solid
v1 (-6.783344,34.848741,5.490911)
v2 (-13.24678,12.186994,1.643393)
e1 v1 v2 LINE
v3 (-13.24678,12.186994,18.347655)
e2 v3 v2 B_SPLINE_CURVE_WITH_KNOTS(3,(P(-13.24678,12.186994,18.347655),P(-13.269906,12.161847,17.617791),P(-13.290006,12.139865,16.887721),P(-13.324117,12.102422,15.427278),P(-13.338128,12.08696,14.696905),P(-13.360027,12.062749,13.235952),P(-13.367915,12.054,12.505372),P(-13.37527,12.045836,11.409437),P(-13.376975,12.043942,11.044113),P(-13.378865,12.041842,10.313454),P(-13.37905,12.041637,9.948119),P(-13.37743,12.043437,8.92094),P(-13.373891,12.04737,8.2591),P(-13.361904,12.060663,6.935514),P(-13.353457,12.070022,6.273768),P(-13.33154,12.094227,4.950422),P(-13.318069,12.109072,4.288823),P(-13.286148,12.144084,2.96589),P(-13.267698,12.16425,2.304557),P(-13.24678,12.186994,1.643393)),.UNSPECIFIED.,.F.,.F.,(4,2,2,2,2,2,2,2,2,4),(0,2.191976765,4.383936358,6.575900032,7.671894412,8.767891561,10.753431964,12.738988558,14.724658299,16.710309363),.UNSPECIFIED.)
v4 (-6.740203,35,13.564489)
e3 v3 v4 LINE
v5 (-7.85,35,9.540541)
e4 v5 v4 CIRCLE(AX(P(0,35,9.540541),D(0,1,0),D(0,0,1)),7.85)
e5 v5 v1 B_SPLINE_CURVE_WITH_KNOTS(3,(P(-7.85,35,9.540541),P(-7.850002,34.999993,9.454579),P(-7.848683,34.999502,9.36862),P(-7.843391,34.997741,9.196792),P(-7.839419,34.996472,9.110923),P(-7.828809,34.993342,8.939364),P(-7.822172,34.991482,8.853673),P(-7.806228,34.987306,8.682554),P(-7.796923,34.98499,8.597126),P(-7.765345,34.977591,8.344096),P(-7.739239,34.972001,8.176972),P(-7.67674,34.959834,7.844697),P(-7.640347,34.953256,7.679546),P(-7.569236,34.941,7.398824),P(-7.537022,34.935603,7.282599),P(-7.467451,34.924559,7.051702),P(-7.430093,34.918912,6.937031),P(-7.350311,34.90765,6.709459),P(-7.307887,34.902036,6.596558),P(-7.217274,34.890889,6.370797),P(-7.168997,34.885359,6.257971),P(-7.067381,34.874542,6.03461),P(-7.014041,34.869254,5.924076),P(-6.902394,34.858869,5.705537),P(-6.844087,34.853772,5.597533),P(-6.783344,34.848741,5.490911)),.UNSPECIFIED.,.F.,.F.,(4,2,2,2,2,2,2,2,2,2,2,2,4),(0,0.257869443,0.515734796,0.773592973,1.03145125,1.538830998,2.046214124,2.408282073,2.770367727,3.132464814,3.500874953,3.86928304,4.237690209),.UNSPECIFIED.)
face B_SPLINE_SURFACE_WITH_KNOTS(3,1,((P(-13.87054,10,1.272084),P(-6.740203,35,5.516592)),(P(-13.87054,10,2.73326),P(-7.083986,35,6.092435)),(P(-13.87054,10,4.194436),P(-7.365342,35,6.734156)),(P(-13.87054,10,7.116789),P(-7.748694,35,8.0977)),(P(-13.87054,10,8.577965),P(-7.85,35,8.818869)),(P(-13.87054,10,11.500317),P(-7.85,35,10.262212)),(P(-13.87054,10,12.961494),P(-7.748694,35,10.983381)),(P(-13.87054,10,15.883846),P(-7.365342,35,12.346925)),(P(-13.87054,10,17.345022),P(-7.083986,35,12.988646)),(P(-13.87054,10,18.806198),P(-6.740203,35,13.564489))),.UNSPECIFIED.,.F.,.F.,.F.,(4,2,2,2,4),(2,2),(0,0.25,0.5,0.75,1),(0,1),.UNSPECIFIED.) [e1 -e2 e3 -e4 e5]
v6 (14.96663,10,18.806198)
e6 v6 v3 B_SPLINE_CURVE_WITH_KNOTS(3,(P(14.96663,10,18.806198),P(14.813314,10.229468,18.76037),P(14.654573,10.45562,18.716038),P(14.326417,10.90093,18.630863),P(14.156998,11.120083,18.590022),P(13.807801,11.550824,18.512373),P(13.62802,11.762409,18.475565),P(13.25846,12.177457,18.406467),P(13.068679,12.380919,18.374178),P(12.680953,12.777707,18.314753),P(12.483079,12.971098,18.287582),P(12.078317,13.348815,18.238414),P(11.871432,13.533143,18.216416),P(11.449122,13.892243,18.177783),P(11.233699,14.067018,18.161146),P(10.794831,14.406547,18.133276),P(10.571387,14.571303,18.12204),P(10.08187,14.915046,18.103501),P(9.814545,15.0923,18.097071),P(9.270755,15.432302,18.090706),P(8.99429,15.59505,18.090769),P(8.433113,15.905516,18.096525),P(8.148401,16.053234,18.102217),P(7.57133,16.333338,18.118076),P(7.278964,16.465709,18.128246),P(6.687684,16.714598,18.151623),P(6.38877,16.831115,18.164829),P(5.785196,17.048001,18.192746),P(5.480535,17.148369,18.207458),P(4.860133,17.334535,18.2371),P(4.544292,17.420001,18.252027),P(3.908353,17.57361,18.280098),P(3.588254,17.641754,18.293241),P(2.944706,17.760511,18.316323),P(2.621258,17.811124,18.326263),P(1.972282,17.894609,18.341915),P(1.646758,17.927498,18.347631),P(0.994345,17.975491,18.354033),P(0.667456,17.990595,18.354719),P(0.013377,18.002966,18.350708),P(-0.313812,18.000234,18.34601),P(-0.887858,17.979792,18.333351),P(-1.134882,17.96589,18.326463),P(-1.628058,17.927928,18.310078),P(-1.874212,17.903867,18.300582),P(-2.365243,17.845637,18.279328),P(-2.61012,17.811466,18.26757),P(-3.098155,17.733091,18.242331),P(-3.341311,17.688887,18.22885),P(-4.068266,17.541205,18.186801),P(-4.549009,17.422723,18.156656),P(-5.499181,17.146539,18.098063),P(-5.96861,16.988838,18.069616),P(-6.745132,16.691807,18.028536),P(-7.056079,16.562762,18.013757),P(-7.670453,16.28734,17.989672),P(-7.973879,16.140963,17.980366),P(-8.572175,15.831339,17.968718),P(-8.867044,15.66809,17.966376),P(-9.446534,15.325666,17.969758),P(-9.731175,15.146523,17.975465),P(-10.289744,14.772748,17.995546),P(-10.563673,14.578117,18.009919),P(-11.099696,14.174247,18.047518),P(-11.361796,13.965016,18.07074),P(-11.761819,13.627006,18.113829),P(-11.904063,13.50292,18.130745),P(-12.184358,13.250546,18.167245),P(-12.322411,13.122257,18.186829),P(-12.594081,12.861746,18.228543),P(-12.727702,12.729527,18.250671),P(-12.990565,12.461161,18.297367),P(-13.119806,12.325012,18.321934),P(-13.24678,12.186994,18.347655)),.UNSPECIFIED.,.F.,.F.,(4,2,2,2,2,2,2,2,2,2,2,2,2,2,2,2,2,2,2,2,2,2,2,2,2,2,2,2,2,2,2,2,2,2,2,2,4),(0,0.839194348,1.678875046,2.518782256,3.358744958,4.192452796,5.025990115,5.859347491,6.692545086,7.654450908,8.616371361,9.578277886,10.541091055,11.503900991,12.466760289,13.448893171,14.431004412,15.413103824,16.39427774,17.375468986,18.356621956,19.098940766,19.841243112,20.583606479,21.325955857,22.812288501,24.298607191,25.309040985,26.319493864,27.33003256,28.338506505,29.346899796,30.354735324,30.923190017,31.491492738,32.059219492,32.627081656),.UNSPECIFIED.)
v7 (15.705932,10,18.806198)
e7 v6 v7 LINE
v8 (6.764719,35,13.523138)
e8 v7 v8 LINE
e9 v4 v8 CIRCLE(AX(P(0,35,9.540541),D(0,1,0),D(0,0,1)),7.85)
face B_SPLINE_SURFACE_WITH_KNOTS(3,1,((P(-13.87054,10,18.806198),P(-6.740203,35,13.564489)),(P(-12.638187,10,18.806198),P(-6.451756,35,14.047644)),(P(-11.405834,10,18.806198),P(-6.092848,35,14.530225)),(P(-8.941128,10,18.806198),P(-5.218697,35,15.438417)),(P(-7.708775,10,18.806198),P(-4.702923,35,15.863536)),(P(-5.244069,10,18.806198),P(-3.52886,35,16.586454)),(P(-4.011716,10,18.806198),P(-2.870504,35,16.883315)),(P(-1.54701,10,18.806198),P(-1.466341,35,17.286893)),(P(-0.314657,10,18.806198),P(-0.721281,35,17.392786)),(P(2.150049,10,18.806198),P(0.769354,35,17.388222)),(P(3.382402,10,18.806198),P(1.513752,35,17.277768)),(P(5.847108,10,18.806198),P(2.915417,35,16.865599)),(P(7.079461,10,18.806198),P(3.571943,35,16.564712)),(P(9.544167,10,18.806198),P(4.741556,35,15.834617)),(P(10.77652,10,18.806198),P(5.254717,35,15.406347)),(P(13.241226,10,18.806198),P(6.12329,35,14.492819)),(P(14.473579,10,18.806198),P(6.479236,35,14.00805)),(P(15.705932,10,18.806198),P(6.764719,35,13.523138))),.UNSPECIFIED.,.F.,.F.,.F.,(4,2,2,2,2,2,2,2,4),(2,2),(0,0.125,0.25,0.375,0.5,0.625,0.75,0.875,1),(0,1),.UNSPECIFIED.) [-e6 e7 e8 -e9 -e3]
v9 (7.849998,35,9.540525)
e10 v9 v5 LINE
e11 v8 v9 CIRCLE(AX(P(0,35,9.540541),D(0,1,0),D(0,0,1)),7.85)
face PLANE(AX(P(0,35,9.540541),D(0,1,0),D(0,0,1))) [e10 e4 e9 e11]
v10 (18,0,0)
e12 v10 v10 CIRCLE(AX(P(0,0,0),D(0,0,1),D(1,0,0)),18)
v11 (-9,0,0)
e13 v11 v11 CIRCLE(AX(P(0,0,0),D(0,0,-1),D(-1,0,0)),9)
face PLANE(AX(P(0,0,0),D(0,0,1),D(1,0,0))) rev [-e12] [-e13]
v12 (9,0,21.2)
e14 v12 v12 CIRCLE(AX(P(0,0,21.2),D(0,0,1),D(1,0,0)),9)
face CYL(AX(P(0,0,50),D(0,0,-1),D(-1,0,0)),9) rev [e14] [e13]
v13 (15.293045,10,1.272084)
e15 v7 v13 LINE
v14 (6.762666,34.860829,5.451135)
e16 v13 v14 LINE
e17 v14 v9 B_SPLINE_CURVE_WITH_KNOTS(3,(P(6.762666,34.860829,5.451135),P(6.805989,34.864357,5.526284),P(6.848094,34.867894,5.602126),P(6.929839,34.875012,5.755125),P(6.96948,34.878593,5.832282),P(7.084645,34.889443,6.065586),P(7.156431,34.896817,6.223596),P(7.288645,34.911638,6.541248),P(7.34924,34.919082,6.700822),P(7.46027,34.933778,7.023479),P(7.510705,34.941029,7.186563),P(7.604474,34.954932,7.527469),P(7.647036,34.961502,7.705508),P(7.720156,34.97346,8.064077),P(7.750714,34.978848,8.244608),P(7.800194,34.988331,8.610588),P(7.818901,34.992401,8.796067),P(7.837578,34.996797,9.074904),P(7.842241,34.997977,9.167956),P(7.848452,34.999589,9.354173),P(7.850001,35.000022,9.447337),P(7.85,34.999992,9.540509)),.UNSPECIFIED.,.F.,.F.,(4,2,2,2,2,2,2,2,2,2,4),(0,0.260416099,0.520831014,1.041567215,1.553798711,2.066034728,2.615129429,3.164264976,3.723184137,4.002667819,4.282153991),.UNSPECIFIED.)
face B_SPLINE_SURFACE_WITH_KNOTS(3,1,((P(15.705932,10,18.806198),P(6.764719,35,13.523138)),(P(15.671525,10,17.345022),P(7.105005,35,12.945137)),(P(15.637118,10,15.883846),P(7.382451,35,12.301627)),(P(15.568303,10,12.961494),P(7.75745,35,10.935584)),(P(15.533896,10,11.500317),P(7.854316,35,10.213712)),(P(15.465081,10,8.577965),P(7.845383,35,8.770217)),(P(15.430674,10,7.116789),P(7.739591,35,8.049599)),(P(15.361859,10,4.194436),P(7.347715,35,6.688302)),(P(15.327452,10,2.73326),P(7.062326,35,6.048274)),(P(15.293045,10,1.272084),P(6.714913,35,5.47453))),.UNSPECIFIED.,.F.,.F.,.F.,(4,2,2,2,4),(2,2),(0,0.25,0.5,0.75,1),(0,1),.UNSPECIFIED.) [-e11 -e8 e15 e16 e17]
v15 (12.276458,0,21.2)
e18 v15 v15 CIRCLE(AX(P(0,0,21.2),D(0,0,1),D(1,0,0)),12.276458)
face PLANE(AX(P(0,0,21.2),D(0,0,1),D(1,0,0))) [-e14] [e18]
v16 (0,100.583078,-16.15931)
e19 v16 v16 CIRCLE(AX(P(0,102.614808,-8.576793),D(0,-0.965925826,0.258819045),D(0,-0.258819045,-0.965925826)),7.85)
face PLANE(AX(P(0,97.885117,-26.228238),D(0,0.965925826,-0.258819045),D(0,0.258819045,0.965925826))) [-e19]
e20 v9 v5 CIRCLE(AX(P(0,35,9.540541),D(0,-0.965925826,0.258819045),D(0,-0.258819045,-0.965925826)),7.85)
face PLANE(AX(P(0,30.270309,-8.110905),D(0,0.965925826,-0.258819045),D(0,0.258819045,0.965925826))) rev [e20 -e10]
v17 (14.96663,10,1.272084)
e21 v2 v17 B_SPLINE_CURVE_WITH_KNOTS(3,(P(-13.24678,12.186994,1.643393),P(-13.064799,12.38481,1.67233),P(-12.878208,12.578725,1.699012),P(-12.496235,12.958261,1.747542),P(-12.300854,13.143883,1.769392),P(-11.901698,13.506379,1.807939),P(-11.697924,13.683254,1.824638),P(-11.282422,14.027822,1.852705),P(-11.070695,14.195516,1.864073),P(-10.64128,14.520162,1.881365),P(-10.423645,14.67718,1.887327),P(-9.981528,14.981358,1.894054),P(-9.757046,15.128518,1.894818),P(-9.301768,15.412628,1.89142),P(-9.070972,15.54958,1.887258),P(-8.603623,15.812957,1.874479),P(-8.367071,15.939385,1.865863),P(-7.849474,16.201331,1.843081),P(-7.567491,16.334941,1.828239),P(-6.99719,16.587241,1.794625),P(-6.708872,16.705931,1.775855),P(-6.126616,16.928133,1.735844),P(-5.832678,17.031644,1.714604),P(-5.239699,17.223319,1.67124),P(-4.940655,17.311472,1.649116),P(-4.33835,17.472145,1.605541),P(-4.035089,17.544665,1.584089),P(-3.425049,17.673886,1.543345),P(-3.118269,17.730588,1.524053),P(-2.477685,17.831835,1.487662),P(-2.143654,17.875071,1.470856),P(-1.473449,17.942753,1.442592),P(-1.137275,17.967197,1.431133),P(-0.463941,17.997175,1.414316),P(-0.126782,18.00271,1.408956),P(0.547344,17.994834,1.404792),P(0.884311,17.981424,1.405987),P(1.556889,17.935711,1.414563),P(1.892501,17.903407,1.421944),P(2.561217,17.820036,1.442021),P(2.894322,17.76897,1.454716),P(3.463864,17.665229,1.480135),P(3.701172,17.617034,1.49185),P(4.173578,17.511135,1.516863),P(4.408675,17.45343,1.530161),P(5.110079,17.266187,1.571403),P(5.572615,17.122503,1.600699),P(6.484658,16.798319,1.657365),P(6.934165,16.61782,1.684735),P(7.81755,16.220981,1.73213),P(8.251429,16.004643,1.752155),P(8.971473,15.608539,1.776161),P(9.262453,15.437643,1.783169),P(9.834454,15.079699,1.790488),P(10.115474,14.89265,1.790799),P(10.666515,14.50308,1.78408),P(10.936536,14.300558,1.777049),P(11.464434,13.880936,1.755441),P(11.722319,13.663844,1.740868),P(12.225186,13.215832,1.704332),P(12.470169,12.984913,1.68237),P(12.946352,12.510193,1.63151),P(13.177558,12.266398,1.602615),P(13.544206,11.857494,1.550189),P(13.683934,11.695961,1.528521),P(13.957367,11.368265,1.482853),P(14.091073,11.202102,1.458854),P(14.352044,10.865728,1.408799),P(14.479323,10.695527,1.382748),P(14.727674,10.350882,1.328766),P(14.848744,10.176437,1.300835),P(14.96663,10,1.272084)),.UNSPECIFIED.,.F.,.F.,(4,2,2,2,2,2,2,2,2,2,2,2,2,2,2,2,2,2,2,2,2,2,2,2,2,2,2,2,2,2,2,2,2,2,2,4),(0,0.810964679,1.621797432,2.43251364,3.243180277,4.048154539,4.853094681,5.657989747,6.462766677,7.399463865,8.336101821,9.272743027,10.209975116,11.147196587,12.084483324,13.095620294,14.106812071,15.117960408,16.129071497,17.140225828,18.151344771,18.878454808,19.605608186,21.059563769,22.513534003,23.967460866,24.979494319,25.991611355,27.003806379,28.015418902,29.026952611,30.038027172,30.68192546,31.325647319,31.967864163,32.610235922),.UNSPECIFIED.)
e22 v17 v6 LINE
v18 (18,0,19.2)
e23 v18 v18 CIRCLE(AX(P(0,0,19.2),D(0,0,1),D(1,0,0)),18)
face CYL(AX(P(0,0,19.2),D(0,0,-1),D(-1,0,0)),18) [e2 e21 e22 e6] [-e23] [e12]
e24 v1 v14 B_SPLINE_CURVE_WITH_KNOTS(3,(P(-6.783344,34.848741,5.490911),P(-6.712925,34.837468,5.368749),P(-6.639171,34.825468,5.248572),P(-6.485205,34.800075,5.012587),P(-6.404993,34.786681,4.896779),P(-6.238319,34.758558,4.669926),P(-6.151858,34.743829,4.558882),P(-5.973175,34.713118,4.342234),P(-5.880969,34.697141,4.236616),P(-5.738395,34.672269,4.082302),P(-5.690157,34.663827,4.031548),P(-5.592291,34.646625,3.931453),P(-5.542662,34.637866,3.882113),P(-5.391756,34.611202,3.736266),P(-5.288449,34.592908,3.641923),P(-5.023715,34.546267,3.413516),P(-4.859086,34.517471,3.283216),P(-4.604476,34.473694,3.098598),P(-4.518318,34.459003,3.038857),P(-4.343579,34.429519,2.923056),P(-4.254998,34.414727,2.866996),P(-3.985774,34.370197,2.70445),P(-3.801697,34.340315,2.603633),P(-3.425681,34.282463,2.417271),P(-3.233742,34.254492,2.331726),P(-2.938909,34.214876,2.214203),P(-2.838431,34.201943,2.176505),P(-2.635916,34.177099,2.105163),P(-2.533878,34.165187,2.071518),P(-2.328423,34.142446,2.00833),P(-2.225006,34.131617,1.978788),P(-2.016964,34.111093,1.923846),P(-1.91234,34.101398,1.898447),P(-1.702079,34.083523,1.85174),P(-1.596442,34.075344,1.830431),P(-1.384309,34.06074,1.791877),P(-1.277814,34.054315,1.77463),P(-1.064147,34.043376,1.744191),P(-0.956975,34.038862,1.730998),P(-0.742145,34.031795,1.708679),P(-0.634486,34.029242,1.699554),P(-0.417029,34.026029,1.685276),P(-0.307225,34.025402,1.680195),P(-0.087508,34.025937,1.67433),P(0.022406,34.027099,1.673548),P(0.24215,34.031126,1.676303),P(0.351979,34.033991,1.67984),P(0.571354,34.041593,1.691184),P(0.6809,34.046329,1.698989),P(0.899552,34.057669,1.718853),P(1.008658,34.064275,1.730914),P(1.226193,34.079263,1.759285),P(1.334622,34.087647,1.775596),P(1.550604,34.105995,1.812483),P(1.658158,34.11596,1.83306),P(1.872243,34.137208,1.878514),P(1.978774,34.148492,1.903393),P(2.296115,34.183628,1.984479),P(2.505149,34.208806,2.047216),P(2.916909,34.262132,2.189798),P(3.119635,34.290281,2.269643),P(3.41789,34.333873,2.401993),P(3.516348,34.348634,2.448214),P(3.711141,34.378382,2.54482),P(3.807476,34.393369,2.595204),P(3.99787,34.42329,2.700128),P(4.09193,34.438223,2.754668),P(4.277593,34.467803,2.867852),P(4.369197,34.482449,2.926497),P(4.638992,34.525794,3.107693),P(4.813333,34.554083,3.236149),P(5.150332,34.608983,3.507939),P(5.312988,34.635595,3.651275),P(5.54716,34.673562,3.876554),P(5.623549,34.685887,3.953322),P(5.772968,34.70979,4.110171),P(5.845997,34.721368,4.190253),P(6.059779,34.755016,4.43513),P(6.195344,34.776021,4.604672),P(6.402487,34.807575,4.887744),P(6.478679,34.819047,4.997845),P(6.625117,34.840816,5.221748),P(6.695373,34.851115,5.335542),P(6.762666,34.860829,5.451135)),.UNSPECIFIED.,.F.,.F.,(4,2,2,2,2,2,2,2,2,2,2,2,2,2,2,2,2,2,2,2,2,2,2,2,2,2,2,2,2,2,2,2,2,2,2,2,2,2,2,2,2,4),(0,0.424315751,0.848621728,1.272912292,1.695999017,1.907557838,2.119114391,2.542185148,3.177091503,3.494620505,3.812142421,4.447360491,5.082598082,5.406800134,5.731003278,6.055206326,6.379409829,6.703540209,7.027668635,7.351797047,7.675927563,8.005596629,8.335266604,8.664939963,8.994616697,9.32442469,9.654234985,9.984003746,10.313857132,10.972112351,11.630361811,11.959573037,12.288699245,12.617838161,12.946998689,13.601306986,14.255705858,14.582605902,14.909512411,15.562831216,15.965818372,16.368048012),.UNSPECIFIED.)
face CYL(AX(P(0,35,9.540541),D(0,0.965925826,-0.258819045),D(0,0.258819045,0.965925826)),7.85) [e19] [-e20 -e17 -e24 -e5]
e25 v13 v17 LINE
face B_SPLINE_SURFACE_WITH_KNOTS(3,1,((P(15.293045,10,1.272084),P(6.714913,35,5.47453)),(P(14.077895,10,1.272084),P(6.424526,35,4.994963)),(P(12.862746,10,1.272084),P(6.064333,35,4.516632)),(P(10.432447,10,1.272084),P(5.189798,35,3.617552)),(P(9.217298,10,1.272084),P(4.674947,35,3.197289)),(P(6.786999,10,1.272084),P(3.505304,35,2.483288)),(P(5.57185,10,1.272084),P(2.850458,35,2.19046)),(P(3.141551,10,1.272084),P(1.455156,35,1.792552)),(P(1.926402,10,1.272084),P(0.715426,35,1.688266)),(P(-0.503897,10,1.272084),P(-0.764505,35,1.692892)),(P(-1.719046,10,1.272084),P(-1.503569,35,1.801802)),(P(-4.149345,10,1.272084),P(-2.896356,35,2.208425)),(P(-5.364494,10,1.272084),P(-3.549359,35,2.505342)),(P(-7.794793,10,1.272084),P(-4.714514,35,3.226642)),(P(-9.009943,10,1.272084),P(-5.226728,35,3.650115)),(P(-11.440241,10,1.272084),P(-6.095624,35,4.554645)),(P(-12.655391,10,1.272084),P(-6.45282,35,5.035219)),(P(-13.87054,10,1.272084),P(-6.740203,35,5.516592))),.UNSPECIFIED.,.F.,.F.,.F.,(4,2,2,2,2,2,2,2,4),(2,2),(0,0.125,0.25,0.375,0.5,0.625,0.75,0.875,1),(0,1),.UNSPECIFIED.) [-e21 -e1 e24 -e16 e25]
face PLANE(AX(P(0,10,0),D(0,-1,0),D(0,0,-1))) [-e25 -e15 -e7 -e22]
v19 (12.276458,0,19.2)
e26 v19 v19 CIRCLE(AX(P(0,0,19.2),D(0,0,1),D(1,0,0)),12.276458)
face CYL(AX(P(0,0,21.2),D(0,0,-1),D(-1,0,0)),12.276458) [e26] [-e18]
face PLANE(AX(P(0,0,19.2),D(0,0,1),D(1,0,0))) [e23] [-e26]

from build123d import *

# Parameters (mm, degrees)
SKETCH1_R               = 18
BOSS_EXTRUDE1_DEPTH     = 19.2
SKETCH2_R               = 12.276458432
SKETCH2_R_2             = 8.347690183
BOSS_EXTRUDE2_DEPTH     = 2
SKETCH3_R               = 8.347690183
BOSS_EXTRUDE4_DEPTH     = 6.8
FILLET1_R               = 4
SKETCH13_R              = 9
CUT_EXTRUDE4_DEPTH      = 50
BOSS_EXTRUDE6_START     = 31.338130328
BOSS_EXTRUDE6_OUTLINE_R = 7.85
BOSS_EXTRUDE6_DEPTH     = 69.999999999


with BuildPart() as part:
    # Sketch1 → Boss-Extrude1 (new body)
    with BuildSketch(Plane.XY):
        Circle(SKETCH1_R)
    extrude(amount=BOSS_EXTRUDE1_DEPTH)

    # Sketch2 → Boss-Extrude2 (add)
    with BuildSketch(Plane.XY.offset(19.2)):
        Circle(SKETCH2_R)
        Circle(SKETCH2_R_2, mode=Mode.SUBTRACT)
    extrude(amount=BOSS_EXTRUDE2_DEPTH)

    # Sketch3 → Boss-Extrude4 (add)
    with BuildSketch(Plane.XY.offset(19.2)):
        Circle(SKETCH3_R)
    extrude(amount=BOSS_EXTRUDE4_DEPTH)

    # Fillet1
    fillet1_edges = [part.edges().sort_by_distance(p)[0] for p in [
        (-8.347690183, 0, 26),
    ]]
    fillet(fillet1_edges, radius=FILLET1_R)

    # Loft5: read off the stored shape, not the designer's step
    # Loft5: loft between two sections, ruled curve by curve
    loft5_from = [
        Edge.make_bspline([(-13.870540046, 10, 1.272084055), (-13.870540046, 10, 2.733260237), (-13.870540046, 10, 4.19443642), (-13.870540046, 10, 7.116788785), (-13.870540046, 10, 8.577964967), (-13.870540046, 10, 11.500317332), (-13.870540046, 10, 12.961493515), (-13.870540046, 10, 15.88384588), (-13.870540046, 10, 17.345022062), (-13.870540046, 10, 18.806198245)], [0, 0, 0, 0, 0.25, 0.25, 0.5, 0.5, 0.75, 0.75, 1, 1, 1, 1], 3),
        Edge.make_bspline([(-13.870540046, 10, 18.806198245), (-12.638187033, 10, 18.806198245), (-11.40583402, 10, 18.806198245), (-8.941127993, 10, 18.806198245), (-7.70877498, 10, 18.806198245), (-5.244068953, 10, 18.806198245), (-4.01171594, 10, 18.806198245), (-1.547009913, 10, 18.806198245), (-0.3146569, 10, 18.806198245), (2.150049127, 10, 18.806198245), (3.38240214, 10, 18.806198245), (5.847108167, 10, 18.806198245), (7.07946118, 10, 18.806198245), (9.544167207, 10, 18.806198245), (10.77652022, 10, 18.806198245), (13.241226247, 10, 18.806198245), (14.47357926, 10, 18.806198245), (15.705932273, 10, 18.806198245)], [0, 0, 0, 0, 0.125, 0.125, 0.25, 0.25, 0.375, 0.375, 0.5, 0.5, 0.625, 0.625, 0.75, 0.75, 0.875, 0.875, 1, 1, 1, 1], 3),
        Edge.make_bspline([(15.293044741, 10, 1.272084055), (14.077895375, 10, 1.272084055), (12.862746008, 10, 1.272084055), (10.432447276, 10, 1.272084055), (9.21729791, 10, 1.272084055), (6.786999178, 10, 1.272084055), (5.571849812, 10, 1.272084055), (3.141551079, 10, 1.272084055), (1.926401713, 10, 1.272084055), (-0.503897019, 10, 1.272084055), (-1.719046385, 10, 1.272084055), (-4.149345117, 10, 1.272084055), (-5.364494484, 10, 1.272084055), (-7.794793216, 10, 1.272084055), (-9.009942582, 10, 1.272084055), (-11.440241314, 10, 1.272084055), (-12.65539068, 10, 1.272084055), (-13.870540046, 10, 1.272084055)], [0, 0, 0, 0, 0.125, 0.125, 0.25, 0.25, 0.375, 0.375, 0.5, 0.5, 0.625, 0.625, 0.75, 0.75, 0.875, 0.875, 1, 1, 1, 1], 3),
        Edge.make_bspline([(15.705932273, 10, 18.806198245), (15.671524979, 10, 17.345022062), (15.637117685, 10, 15.88384588), (15.568303096, 10, 12.961493515), (15.533895801, 10, 11.500317332), (15.465081213, 10, 8.577964967), (15.430673918, 10, 7.116788785), (15.361859329, 10, 4.19443642), (15.327452035, 10, 2.733260237), (15.293044741, 10, 1.272084055)], [0, 0, 0, 0, 0.25, 0.25, 0.5, 0.5, 0.75, 0.75, 1, 1, 1, 1], 3),
    ]
    loft5_to = [
        Edge.make_bspline([(-6.740203008, 35, 5.516591807), (-7.083985671, 35, 6.09243536), (-7.365341755, 35, 6.734156051), (-7.74869442, 35, 8.097700335), (-7.85, 35, 8.818869121), (-7.85, 35, 10.26221196), (-7.74869442, 35, 10.983380746), (-7.365341755, 35, 12.34692503), (-7.083985671, 35, 12.988645721), (-6.740203008, 35, 13.564489274)], [0, 0, 0, 0, 0.25, 0.25, 0.5, 0.5, 0.75, 0.75, 1, 1, 1, 1], 3),
        Edge.make_bspline([(-6.740203008, 35, 13.564489274), (-6.451756257, 35, 14.047643954), (-6.092847535, 35, 14.530224597), (-5.218696772, 35, 15.438416605), (-4.702923047, 35, 15.863536141), (-3.528860323, 35, 16.586454489), (-2.870504053, 35, 16.883315453), (-1.466341415, 35, 17.286893217), (-0.721281456, 35, 17.392785885), (0.769354223, 35, 17.388221597), (1.513751736, 35, 17.277768249), (2.915416578, 35, 16.865599114), (3.57194256, 35, 16.564712015), (4.741556195, 35, 15.834617391), (5.254716863, 35, 15.406347285), (6.123289567, 35, 14.492819102), (6.479236287, 35, 14.00804959), (6.764718843, 35, 13.523137554)], [0, 0, 0, 0, 0.125, 0.125, 0.25, 0.25, 0.375, 0.375, 0.5, 0.5, 0.625, 0.625, 0.75, 0.75, 0.875, 0.875, 1, 1, 1, 1], 3),
        Edge.make_bspline([(6.714912928, 35, 5.474529674), (6.424525906, 35, 4.994962936), (6.064332724, 35, 4.516631942), (5.189797582, 35, 3.61755227), (4.674946594, 35, 3.197289059), (3.505304255, 35, 2.483288448), (2.850457816, 35, 2.190459602), (1.45515568, 35, 1.792552317), (0.715425599, 35, 1.688265686), (-0.76450524, 35, 1.692892109), (-1.503568847, 35, 1.801801607), (-2.896355935, 35, 2.208424757), (-3.549358764, 35, 2.50534208), (-4.714514202, 35, 3.226641519), (-5.226727577, 35, 3.650115443), (-6.095624443, 35, 4.55464527), (-6.452819986, 35, 5.035218898), (-6.740203008, 35, 5.516591807)], [0, 0, 0, 0, 0.125, 0.125, 0.25, 0.25, 0.375, 0.375, 0.5, 0.5, 0.625, 0.625, 0.75, 0.75, 0.875, 0.875, 1, 1, 1, 1], 3),
        Edge.make_bspline([(6.764718843, 35, 13.523137554), (7.105005207, 35, 12.945137428), (7.382450639, 35, 12.301626641), (7.757449733, 35, 10.935584457), (7.854315981, 35, 10.21371246), (7.845383427, 35, 8.770216678), (7.739590849, 35, 8.049598762), (7.347714599, 35, 6.68830211), (7.062326449, 35, 6.048274216), (6.714912928, 35, 5.474529674)], [0, 0, 0, 0, 0.25, 0.25, 0.5, 0.5, 0.75, 0.75, 1, 1, 1, 1], 3),
    ]
    loft5 = Solid(Shell([*[Face.make_surface_from_curves(loft5_from[k], loft5_to[k]) for k in range(4)], Face(Wire(loft5_from)), Face(Wire(loft5_to))]))
    add(loft5)

    # Sketch13 → Cut-Extrude4 (cut)
    with BuildSketch(Plane(origin=(0, 0, 0), x_dir=(-1, 0, 0), z_dir=(0, 0, -1))):
        Circle(SKETCH13_R)
    extrude(amount=-CUT_EXTRUDE4_DEPTH, mode=Mode.SUBTRACT)

    # Boss-Extrude6: read off the stored shape, not the designer's step
    # Boss-Extrude6 outline → Boss-Extrude6 (add)
    with BuildSketch(Plane(origin=(0, 0, 0), x_dir=(1, 0, 0), z_dir=(0, 0.9659258262890691, -0.2588190451025181)).offset(BOSS_EXTRUDE6_START)):
        with Locations((0, -18.274121083)):
            Circle(BOSS_EXTRUDE6_OUTLINE_R)
    extrude(amount=BOSS_EXTRUDE6_DEPTH)


solid = part.part
